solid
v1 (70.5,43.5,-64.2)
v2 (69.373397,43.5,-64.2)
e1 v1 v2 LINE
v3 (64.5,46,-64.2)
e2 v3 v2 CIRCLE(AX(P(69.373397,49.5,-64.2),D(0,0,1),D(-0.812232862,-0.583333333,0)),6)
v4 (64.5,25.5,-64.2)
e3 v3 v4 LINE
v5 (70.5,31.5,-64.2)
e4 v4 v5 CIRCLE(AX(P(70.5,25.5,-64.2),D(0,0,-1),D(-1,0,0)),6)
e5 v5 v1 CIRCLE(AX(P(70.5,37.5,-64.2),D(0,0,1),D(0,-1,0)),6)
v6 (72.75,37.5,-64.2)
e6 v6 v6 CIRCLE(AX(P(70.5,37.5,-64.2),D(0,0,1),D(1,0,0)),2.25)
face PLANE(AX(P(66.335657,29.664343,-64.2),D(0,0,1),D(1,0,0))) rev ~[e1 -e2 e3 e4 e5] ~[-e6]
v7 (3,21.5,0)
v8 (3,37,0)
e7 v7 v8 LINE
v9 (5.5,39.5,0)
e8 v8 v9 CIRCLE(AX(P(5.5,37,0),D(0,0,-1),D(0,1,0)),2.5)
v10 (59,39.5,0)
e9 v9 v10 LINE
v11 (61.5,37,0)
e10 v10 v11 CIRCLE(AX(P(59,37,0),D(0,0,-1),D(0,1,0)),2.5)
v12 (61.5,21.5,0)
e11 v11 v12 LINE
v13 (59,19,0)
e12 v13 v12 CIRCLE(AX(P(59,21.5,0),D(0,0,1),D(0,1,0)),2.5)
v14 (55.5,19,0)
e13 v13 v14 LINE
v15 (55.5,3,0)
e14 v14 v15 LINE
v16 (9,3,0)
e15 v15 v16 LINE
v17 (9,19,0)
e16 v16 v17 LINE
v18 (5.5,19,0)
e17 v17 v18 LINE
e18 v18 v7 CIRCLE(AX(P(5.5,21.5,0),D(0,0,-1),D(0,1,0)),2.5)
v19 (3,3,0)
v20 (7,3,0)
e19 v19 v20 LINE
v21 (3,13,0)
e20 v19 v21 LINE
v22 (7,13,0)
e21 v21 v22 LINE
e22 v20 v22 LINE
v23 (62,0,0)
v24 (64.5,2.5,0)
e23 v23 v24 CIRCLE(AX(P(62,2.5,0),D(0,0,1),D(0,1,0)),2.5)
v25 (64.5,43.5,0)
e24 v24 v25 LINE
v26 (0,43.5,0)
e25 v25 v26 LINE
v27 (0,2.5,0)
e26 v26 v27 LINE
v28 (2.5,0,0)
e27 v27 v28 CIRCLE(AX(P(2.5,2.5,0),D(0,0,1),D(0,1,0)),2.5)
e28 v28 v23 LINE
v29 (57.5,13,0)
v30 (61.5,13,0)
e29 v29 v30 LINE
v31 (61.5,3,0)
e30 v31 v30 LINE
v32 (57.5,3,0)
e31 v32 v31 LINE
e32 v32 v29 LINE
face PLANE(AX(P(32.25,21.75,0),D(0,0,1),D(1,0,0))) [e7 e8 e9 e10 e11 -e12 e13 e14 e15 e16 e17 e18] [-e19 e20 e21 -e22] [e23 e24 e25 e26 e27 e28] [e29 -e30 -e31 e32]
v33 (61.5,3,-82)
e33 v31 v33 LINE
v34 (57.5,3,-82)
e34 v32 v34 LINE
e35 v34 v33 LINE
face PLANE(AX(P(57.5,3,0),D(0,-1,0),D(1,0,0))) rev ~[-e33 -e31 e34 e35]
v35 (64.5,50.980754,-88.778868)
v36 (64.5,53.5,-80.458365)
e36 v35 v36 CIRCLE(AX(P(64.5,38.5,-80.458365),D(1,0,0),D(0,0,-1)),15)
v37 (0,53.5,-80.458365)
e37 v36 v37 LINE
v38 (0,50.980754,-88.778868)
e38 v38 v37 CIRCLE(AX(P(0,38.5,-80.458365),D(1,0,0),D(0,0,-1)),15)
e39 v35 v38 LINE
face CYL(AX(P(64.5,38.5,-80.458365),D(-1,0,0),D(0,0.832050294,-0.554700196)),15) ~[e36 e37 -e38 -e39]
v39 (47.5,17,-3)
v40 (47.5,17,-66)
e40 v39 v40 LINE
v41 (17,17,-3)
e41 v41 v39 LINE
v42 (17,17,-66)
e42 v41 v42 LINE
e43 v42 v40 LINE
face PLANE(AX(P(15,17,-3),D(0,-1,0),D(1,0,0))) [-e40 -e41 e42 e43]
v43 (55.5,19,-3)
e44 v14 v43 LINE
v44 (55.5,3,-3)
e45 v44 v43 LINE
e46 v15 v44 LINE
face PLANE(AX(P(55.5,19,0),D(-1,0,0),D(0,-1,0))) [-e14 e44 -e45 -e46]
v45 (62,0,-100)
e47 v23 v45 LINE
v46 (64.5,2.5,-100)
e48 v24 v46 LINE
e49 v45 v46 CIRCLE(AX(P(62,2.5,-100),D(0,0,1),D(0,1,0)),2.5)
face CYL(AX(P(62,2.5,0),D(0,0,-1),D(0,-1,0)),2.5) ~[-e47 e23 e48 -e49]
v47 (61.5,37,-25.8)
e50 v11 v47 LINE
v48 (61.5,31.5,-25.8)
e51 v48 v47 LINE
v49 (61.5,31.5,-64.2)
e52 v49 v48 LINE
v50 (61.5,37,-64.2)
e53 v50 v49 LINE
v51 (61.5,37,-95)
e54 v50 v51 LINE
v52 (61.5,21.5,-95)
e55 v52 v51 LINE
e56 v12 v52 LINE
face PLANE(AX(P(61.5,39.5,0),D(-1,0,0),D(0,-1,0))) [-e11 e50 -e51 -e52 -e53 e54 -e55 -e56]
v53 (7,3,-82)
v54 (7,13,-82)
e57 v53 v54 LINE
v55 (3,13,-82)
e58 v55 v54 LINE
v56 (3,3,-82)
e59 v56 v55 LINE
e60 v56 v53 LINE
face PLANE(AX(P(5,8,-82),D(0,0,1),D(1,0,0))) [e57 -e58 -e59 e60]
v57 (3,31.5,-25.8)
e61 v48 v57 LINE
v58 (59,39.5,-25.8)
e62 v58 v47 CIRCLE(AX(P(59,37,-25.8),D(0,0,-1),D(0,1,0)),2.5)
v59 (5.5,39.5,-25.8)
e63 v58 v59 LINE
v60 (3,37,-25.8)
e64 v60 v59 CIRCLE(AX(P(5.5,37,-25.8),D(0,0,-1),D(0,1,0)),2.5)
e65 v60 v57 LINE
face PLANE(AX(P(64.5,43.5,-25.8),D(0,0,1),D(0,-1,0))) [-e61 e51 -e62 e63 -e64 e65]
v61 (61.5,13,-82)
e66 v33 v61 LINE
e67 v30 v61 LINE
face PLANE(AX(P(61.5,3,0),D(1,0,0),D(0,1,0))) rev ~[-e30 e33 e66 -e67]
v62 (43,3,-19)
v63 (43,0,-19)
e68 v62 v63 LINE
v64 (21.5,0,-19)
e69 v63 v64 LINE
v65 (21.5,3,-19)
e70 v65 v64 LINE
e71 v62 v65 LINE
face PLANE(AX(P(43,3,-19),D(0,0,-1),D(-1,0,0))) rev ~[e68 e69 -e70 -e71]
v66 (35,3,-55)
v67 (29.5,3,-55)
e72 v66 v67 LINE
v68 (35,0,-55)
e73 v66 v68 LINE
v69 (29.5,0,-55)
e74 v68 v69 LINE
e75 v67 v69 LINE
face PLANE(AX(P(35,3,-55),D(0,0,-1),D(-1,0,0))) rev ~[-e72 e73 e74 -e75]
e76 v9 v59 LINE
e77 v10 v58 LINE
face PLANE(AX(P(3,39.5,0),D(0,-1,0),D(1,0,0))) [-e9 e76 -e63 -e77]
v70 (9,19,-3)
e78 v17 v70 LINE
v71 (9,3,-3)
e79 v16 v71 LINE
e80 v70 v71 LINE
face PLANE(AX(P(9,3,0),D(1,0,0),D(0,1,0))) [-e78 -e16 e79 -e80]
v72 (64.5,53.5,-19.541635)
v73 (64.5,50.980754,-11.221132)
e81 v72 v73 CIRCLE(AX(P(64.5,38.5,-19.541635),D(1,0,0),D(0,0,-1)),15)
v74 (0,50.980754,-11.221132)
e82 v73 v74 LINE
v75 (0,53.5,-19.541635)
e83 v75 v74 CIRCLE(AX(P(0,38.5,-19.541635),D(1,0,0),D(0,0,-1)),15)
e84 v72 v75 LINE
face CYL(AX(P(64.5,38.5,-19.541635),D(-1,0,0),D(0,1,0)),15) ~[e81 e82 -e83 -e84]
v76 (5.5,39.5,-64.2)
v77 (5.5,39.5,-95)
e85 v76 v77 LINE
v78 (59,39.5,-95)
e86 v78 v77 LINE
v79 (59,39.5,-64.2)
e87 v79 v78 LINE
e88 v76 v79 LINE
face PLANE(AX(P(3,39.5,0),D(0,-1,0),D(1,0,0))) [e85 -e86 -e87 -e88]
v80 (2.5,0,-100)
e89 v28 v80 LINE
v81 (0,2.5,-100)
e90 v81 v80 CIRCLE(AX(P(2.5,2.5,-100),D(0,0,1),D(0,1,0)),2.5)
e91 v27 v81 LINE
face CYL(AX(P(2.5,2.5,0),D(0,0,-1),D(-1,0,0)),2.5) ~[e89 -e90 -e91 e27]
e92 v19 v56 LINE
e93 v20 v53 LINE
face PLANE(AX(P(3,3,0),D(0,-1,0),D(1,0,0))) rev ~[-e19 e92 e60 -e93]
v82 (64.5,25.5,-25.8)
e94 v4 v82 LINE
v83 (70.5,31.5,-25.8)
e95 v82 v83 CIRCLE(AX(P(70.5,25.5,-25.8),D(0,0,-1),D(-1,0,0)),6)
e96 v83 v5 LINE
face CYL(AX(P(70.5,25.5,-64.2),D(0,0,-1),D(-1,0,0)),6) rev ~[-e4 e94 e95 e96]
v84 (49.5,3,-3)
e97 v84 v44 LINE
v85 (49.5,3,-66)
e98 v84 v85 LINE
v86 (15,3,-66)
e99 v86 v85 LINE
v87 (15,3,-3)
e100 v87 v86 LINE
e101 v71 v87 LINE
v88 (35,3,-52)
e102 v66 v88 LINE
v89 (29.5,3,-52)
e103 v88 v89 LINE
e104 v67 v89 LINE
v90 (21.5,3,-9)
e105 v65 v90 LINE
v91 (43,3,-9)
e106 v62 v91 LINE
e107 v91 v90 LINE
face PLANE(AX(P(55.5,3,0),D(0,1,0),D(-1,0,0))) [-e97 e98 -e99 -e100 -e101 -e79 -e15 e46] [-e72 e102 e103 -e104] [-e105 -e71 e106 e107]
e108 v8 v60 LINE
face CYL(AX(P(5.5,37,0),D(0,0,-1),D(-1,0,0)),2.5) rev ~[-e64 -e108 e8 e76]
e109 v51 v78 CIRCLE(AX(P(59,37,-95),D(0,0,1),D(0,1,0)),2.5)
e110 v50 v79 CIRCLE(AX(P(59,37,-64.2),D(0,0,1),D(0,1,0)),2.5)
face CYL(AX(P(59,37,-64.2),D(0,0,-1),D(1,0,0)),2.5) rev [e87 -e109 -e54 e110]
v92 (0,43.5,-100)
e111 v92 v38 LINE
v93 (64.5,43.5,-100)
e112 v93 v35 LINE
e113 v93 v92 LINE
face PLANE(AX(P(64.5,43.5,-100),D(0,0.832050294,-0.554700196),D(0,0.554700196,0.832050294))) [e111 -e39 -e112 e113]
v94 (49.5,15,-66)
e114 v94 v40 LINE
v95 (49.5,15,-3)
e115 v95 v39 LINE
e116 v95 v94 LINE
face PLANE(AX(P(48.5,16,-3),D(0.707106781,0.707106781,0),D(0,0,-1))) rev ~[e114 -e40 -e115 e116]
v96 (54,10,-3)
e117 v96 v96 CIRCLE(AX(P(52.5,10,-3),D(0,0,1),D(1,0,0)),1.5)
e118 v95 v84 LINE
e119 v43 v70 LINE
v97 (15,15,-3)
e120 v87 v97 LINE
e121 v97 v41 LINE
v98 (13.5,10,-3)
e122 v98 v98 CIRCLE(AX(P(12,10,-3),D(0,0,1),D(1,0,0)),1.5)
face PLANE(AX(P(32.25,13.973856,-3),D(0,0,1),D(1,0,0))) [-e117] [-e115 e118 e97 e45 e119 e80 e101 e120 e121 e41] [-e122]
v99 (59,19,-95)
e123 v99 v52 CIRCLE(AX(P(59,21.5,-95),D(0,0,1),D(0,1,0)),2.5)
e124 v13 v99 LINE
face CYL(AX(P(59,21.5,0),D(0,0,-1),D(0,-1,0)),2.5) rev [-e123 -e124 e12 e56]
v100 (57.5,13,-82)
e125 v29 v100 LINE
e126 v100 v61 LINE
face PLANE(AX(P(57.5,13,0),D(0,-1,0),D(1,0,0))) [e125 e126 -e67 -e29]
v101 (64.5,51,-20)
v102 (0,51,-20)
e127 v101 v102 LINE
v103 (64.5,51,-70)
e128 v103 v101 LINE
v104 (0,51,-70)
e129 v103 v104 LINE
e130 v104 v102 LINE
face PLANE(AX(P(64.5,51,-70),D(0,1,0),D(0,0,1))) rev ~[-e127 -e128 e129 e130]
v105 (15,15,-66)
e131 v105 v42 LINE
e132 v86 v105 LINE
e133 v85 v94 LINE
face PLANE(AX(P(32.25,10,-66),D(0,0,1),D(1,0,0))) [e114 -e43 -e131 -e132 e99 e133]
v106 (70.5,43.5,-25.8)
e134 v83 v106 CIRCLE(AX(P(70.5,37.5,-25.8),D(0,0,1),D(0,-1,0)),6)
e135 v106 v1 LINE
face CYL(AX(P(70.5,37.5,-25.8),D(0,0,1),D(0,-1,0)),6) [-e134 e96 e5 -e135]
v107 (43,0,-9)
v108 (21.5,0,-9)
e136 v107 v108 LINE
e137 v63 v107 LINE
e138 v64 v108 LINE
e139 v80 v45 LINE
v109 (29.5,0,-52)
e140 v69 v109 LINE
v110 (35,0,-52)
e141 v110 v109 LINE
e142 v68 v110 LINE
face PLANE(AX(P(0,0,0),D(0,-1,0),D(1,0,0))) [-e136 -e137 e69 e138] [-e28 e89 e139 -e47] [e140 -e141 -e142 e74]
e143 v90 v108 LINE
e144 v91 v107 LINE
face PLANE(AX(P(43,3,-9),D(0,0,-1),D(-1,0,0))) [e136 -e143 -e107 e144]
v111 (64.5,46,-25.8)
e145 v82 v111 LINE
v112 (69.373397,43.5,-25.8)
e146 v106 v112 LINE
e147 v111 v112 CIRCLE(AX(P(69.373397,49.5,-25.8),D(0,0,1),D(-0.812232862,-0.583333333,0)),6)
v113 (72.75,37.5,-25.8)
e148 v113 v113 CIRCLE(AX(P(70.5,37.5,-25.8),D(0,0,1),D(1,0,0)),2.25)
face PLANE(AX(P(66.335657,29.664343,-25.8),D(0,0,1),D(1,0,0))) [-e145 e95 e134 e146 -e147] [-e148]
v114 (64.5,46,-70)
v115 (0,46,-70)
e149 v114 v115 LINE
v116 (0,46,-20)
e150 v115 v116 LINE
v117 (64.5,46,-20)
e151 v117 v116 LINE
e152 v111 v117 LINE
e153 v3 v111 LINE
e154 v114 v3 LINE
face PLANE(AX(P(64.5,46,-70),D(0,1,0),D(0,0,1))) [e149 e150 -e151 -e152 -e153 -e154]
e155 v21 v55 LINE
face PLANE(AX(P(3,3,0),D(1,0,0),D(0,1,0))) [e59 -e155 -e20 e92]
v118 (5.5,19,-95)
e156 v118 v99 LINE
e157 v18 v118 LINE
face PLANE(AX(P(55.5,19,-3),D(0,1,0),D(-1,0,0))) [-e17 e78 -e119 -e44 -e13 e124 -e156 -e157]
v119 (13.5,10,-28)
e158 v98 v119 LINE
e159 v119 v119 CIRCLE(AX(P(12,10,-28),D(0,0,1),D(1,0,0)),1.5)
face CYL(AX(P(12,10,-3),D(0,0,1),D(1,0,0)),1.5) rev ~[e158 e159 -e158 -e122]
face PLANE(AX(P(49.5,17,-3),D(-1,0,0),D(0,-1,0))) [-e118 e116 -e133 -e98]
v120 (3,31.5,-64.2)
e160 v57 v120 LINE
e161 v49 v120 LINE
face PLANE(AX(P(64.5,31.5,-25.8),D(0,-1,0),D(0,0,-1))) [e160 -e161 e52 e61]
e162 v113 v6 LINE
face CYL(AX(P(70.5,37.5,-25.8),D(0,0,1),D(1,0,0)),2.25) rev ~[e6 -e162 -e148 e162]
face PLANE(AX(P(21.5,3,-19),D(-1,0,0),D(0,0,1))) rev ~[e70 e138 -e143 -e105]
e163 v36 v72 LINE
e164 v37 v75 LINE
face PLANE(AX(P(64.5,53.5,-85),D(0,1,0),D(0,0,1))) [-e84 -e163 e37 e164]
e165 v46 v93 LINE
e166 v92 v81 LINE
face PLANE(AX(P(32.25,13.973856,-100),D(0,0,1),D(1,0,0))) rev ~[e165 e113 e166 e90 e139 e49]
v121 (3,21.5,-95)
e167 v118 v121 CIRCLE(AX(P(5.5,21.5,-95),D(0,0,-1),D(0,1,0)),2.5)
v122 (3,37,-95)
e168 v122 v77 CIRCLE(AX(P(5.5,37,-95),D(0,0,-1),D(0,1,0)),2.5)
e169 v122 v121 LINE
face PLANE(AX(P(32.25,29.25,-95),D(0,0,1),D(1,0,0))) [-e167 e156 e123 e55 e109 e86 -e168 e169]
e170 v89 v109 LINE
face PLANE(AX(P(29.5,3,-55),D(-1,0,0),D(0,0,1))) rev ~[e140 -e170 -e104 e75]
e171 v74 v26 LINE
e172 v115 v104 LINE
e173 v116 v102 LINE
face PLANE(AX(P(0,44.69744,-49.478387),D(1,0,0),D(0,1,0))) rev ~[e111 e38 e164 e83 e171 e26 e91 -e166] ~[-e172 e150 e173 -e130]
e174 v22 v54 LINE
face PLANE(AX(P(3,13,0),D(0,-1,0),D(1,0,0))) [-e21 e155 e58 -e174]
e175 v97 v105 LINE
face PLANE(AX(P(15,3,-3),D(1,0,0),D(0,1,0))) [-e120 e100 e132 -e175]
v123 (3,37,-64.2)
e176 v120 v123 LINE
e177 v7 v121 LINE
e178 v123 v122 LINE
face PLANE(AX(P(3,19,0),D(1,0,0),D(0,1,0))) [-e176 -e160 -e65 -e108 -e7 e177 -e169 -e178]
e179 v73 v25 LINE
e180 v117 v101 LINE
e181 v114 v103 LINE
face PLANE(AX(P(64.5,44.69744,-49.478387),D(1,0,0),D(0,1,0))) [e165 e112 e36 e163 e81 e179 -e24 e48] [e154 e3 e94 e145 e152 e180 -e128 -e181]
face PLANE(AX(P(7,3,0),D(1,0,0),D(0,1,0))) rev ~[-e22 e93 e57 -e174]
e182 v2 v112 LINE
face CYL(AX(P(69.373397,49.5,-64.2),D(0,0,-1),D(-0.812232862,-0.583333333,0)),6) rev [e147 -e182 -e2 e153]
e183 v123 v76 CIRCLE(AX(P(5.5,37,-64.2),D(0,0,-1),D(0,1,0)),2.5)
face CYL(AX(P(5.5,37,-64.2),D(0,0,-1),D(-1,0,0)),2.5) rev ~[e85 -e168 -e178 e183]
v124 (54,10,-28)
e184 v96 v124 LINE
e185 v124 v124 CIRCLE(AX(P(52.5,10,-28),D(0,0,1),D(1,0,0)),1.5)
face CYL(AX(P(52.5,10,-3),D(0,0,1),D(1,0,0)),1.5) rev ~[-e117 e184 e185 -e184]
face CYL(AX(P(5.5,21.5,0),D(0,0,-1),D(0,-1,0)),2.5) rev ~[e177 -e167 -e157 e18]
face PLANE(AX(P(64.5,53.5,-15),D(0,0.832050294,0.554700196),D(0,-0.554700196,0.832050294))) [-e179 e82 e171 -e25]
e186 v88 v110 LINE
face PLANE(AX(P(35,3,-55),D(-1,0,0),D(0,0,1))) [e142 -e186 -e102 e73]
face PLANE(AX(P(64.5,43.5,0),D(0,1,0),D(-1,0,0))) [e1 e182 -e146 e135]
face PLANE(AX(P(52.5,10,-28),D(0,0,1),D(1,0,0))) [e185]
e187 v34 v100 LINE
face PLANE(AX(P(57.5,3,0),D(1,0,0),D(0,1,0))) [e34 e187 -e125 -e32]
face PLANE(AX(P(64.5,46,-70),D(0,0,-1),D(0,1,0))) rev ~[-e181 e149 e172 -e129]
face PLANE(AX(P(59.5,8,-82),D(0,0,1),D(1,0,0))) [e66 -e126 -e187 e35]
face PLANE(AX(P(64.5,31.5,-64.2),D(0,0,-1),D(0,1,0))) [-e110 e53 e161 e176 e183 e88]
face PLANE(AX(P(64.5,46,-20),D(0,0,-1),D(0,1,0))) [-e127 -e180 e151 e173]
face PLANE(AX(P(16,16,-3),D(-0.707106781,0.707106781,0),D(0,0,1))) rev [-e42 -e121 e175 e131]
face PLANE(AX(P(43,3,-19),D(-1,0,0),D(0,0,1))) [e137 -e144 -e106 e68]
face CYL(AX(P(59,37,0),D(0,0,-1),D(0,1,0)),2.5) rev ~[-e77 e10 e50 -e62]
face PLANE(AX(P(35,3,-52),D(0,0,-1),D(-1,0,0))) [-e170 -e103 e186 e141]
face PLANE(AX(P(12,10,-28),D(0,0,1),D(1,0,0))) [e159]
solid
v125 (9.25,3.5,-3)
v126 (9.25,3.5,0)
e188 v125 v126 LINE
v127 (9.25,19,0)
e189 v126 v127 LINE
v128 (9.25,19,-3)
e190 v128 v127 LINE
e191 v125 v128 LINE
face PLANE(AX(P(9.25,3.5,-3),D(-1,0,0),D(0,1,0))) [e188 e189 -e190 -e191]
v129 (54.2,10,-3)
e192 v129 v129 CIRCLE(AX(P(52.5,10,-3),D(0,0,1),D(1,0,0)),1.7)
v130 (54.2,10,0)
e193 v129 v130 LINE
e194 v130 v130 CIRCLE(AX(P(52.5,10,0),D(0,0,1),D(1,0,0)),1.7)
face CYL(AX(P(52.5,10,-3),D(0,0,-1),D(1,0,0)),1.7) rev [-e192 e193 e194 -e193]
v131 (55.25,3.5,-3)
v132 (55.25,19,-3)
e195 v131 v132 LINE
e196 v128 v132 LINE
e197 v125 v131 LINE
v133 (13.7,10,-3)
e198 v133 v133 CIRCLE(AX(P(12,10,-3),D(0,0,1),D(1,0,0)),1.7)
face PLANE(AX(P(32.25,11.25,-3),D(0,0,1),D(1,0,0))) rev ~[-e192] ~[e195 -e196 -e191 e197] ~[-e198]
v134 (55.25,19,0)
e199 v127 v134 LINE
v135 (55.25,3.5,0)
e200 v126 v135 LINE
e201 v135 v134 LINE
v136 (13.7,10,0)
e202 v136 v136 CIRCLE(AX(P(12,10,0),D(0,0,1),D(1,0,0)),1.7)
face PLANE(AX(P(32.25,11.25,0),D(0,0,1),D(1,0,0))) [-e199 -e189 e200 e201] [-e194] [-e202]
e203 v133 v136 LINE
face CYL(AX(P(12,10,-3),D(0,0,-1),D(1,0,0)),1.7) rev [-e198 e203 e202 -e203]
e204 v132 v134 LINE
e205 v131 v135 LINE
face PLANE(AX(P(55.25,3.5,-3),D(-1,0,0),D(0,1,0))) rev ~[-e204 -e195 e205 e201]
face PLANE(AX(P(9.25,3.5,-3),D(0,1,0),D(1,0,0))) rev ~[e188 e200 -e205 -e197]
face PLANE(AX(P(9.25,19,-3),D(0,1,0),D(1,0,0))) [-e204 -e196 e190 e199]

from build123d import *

# Parameters (mm, degrees)
F0_W         = 4
F0_H         = 10
F1_DEPTH     = 100
F2_START     = -3
F0_R         = 1.5
F2_DEPTH     = 97
F3_START     = -28
F3_DEPTH     = 72
F4_START     = -95
F4_DEPTH     = 5
F5_START     = -66
F0_W_2       = 34.5
F0_H_2       = 14
F5_DEPTH     = 34
F6_START     = -25.8
F0_R_2       = 3.75
F0_R_3       = 2.25
F6_DEPTH     = 38.4
F7_START     = -82
F7_DEPTH     = 18
F8_W         = 5
F8_H         = 50
F9_DEPTH     = 64.5
F10_W        = 46
F10_H        = 15.5
F10_R        = 1.7
F11_DEPTH    = 3
F12_W        = 21.5
F12_H        = 10
F12_W_2      = 5.5
F12_H_2      = 3
F13_DEPTH    = 3
F14_R        = 2.5
F15_R        = 2.5
F16_T1_DEPTH = 38.4
F17_R        = 15
F18_SIZE     = 2


# Not quite as in the source:
# - a fillet or chamfer that OpenCascade refuses, or shapes differently, is made with other operations: its cross-section is extruded or revolved along the edge and cut away or added


with BuildPart() as f1:
    # F0 (on Top) → F1 (new body)
    with BuildSketch(Plane.XY):
        Polygon((64.5, 43.5), (0, 43.5), (0, 31.5), (0, 0), (64.5, 0), (64.5, 31.5), align=None)
        with Locations((5, 8)):
            Rectangle(F0_W, F0_H, mode=Mode.SUBTRACT)
        with Locations((59.5, 8)):
            Rectangle(F0_W, F0_H, mode=Mode.SUBTRACT)
        Polygon((9, 19), (3, 19), (3, 39.5), (61.5, 39.5), (61.5, 19), (55.5, 19), (55.5, 3), (49.5, 3), (15, 3), (9, 3), align=None, mode=Mode.SUBTRACT)
    extrude(amount=-F1_DEPTH)

    # F0 (on Top) → F2 (join)
    with BuildSketch(Plane.XY.offset(F2_START)):
        Polygon((55.5, 19), (9, 19), (9, 3), (15, 3), (15, 17), (49.5, 17), (49.5, 3), (55.5, 3), align=None)
        with Locations((12, 10)):
            Circle(F0_R, mode=Mode.SUBTRACT)
        with Locations((52.5, 10)):
            Circle(F0_R, mode=Mode.SUBTRACT)
    extrude(amount=-F2_DEPTH)

    # F0 (on Top) → F3 (join)
    with BuildSketch(Plane.XY.offset(F3_START)):
        with Locations((52.5, 10)):
            Circle(F0_R)
        with Locations((12, 10)):
            Circle(F0_R)
    extrude(amount=-F3_DEPTH)

    # F0 (on Top) → F4 (join)
    with BuildSketch(Plane.XY.offset(F4_START)):
        Polygon((3, 39.5), (3, 19), (9, 19), (55.5, 19), (61.5, 19), (61.5, 39.5), align=None)
    extrude(amount=-F4_DEPTH)

    # F0 (on Top) → F5 (join)
    with BuildSketch(Plane.XY.offset(F5_START)):
        with Locations((32.25, 10)):
            Rectangle(F0_W_2, F0_H_2)
    extrude(amount=-F5_DEPTH)

    # F0 (on Top) → F6 (join)
    with BuildSketch(Plane.XY.offset(F6_START)):
        with BuildLine():
            Line((70.5, 43.5), (64.5, 43.5))
            Line((64.5, 43.5), (64.5, 31.5))
            Line((64.5, 31.5), (70.5, 31.5))
            ThreePointArc((70.5, 31.5), (76.5, 37.5), (70.5, 43.5))
        make_face()
        with Locations((70.5, 37.5)):
            Circle(F0_R_2, mode=Mode.SUBTRACT)
        with Locations((70.5, 37.5)):
            Circle(F0_R_2)
        with Locations((70.5, 37.5)):
            Circle(F0_R_3, mode=Mode.SUBTRACT)
    extrude(amount=-F6_DEPTH)

    # F0 (on Top) → F7 (join)
    with BuildSketch(Plane.XY.offset(F7_START)):
        with Locations((5, 8)):
            Rectangle(F0_W, F0_H)
        with Locations((59.5, 8)):
            Rectangle(F0_W, F0_H)
    extrude(amount=-F7_DEPTH)

    # F8 (on face) → F9 (join, through all)
    with BuildSketch(Plane.YZ.offset(64.5)):
        Polygon((53.5, -15), (43.5, 0), (43.5, -25.8), (31.5, -25.8), (31.5, -64.2), (43.5, -64.2), (43.5, -100), (53.5, -85), align=None)
        with Locations((48.5, -45)):
            Rectangle(F8_W, F8_H, mode=Mode.SUBTRACT)
    extrude(amount=-F9_DEPTH)

    # F12 (on face) → F13 (cut, through all)
    with BuildSketch(Plane(origin=(0, 3, 0), x_dir=(-1, 0, 0), z_dir=(0, 1, 0))):
        with Locations((-32.25, -14)):
            Rectangle(F12_W, F12_H)
        with Locations((-32.25, -53.5)):
            Rectangle(F12_W_2, F12_H_2)
    extrude(amount=-F13_DEPTH, mode=Mode.SUBTRACT)

    # F14
    f14_edges = [f1.edges().sort_by_distance(p)[0] for p in [
        (3, 39.5, -12.9),
        (3, 39.5, -79.6),
        (61.5, 39.5, -12.9),
        (61.5, 39.5, -79.6),
        (61.5, 19, -47.5),
        (3, 19, -47.5),
    ]]
    fillet(f14_edges, radius=F14_R)

    # F15
    f15_edges = [f1.edges().sort_by_distance(p)[0] for p in [
        (0, 0, -50),
        (64.5, 0, -50),
    ]]
    fillet(f15_edges, radius=F15_R)

    # F16: fillet of radius 6 on 2 edges, made by hand

    # F16_s2 → F16_t1 (join)
    with BuildSketch(Plane.XY.offset(-64.2)):
        with BuildLine():
            ThreePointArc((64.5, 25.5), (66.2573593129, 29.7426406871), (70.5, 31.5))
            Line((70.5, 31.5), (64.5, 31.5))
            Line((64.5, 31.5), (64.5, 25.5))
        make_face()
        with BuildLine():
            ThreePointArc((64.5, 46), (66.6347843849, 44.161460874), (69.3733971724, 43.5))
            Line((69.3733971724, 43.5), (64.5, 43.5))
            Line((64.5, 43.5), (64.5, 46))
        make_face()
    extrude(amount=F16_T1_DEPTH)

    # F17
    f17_edges = [f1.edges().sort_by_distance(p)[0] for p in [
        (32.25, 53.5, -15),
        (32.25, 53.5, -85),
    ]]
    fillet(f17_edges, radius=F17_R)

    # F18
    f18_edges = [f1.edges().sort_by_distance(p)[0] for p in [
        (15, 17, -34.5),
        (49.5, 17, -34.5),
    ]]
    chamfer(f18_edges, length=F18_SIZE)


with BuildPart() as f11:
    # F10 (on face) → F11 (new body, through all)
    with BuildSketch(Plane.XY.offset(-3)):
        with Locations((32.25, 11.25)):
            Rectangle(F10_W, F10_H)
        with Locations((12, 10)):
            Circle(F10_R, mode=Mode.SUBTRACT)
        with Locations((52.5, 10)):
            Circle(F10_R, mode=Mode.SUBTRACT)
    extrude(amount=F11_DEPTH)


solid = Compound([f1.part, f11.part])
